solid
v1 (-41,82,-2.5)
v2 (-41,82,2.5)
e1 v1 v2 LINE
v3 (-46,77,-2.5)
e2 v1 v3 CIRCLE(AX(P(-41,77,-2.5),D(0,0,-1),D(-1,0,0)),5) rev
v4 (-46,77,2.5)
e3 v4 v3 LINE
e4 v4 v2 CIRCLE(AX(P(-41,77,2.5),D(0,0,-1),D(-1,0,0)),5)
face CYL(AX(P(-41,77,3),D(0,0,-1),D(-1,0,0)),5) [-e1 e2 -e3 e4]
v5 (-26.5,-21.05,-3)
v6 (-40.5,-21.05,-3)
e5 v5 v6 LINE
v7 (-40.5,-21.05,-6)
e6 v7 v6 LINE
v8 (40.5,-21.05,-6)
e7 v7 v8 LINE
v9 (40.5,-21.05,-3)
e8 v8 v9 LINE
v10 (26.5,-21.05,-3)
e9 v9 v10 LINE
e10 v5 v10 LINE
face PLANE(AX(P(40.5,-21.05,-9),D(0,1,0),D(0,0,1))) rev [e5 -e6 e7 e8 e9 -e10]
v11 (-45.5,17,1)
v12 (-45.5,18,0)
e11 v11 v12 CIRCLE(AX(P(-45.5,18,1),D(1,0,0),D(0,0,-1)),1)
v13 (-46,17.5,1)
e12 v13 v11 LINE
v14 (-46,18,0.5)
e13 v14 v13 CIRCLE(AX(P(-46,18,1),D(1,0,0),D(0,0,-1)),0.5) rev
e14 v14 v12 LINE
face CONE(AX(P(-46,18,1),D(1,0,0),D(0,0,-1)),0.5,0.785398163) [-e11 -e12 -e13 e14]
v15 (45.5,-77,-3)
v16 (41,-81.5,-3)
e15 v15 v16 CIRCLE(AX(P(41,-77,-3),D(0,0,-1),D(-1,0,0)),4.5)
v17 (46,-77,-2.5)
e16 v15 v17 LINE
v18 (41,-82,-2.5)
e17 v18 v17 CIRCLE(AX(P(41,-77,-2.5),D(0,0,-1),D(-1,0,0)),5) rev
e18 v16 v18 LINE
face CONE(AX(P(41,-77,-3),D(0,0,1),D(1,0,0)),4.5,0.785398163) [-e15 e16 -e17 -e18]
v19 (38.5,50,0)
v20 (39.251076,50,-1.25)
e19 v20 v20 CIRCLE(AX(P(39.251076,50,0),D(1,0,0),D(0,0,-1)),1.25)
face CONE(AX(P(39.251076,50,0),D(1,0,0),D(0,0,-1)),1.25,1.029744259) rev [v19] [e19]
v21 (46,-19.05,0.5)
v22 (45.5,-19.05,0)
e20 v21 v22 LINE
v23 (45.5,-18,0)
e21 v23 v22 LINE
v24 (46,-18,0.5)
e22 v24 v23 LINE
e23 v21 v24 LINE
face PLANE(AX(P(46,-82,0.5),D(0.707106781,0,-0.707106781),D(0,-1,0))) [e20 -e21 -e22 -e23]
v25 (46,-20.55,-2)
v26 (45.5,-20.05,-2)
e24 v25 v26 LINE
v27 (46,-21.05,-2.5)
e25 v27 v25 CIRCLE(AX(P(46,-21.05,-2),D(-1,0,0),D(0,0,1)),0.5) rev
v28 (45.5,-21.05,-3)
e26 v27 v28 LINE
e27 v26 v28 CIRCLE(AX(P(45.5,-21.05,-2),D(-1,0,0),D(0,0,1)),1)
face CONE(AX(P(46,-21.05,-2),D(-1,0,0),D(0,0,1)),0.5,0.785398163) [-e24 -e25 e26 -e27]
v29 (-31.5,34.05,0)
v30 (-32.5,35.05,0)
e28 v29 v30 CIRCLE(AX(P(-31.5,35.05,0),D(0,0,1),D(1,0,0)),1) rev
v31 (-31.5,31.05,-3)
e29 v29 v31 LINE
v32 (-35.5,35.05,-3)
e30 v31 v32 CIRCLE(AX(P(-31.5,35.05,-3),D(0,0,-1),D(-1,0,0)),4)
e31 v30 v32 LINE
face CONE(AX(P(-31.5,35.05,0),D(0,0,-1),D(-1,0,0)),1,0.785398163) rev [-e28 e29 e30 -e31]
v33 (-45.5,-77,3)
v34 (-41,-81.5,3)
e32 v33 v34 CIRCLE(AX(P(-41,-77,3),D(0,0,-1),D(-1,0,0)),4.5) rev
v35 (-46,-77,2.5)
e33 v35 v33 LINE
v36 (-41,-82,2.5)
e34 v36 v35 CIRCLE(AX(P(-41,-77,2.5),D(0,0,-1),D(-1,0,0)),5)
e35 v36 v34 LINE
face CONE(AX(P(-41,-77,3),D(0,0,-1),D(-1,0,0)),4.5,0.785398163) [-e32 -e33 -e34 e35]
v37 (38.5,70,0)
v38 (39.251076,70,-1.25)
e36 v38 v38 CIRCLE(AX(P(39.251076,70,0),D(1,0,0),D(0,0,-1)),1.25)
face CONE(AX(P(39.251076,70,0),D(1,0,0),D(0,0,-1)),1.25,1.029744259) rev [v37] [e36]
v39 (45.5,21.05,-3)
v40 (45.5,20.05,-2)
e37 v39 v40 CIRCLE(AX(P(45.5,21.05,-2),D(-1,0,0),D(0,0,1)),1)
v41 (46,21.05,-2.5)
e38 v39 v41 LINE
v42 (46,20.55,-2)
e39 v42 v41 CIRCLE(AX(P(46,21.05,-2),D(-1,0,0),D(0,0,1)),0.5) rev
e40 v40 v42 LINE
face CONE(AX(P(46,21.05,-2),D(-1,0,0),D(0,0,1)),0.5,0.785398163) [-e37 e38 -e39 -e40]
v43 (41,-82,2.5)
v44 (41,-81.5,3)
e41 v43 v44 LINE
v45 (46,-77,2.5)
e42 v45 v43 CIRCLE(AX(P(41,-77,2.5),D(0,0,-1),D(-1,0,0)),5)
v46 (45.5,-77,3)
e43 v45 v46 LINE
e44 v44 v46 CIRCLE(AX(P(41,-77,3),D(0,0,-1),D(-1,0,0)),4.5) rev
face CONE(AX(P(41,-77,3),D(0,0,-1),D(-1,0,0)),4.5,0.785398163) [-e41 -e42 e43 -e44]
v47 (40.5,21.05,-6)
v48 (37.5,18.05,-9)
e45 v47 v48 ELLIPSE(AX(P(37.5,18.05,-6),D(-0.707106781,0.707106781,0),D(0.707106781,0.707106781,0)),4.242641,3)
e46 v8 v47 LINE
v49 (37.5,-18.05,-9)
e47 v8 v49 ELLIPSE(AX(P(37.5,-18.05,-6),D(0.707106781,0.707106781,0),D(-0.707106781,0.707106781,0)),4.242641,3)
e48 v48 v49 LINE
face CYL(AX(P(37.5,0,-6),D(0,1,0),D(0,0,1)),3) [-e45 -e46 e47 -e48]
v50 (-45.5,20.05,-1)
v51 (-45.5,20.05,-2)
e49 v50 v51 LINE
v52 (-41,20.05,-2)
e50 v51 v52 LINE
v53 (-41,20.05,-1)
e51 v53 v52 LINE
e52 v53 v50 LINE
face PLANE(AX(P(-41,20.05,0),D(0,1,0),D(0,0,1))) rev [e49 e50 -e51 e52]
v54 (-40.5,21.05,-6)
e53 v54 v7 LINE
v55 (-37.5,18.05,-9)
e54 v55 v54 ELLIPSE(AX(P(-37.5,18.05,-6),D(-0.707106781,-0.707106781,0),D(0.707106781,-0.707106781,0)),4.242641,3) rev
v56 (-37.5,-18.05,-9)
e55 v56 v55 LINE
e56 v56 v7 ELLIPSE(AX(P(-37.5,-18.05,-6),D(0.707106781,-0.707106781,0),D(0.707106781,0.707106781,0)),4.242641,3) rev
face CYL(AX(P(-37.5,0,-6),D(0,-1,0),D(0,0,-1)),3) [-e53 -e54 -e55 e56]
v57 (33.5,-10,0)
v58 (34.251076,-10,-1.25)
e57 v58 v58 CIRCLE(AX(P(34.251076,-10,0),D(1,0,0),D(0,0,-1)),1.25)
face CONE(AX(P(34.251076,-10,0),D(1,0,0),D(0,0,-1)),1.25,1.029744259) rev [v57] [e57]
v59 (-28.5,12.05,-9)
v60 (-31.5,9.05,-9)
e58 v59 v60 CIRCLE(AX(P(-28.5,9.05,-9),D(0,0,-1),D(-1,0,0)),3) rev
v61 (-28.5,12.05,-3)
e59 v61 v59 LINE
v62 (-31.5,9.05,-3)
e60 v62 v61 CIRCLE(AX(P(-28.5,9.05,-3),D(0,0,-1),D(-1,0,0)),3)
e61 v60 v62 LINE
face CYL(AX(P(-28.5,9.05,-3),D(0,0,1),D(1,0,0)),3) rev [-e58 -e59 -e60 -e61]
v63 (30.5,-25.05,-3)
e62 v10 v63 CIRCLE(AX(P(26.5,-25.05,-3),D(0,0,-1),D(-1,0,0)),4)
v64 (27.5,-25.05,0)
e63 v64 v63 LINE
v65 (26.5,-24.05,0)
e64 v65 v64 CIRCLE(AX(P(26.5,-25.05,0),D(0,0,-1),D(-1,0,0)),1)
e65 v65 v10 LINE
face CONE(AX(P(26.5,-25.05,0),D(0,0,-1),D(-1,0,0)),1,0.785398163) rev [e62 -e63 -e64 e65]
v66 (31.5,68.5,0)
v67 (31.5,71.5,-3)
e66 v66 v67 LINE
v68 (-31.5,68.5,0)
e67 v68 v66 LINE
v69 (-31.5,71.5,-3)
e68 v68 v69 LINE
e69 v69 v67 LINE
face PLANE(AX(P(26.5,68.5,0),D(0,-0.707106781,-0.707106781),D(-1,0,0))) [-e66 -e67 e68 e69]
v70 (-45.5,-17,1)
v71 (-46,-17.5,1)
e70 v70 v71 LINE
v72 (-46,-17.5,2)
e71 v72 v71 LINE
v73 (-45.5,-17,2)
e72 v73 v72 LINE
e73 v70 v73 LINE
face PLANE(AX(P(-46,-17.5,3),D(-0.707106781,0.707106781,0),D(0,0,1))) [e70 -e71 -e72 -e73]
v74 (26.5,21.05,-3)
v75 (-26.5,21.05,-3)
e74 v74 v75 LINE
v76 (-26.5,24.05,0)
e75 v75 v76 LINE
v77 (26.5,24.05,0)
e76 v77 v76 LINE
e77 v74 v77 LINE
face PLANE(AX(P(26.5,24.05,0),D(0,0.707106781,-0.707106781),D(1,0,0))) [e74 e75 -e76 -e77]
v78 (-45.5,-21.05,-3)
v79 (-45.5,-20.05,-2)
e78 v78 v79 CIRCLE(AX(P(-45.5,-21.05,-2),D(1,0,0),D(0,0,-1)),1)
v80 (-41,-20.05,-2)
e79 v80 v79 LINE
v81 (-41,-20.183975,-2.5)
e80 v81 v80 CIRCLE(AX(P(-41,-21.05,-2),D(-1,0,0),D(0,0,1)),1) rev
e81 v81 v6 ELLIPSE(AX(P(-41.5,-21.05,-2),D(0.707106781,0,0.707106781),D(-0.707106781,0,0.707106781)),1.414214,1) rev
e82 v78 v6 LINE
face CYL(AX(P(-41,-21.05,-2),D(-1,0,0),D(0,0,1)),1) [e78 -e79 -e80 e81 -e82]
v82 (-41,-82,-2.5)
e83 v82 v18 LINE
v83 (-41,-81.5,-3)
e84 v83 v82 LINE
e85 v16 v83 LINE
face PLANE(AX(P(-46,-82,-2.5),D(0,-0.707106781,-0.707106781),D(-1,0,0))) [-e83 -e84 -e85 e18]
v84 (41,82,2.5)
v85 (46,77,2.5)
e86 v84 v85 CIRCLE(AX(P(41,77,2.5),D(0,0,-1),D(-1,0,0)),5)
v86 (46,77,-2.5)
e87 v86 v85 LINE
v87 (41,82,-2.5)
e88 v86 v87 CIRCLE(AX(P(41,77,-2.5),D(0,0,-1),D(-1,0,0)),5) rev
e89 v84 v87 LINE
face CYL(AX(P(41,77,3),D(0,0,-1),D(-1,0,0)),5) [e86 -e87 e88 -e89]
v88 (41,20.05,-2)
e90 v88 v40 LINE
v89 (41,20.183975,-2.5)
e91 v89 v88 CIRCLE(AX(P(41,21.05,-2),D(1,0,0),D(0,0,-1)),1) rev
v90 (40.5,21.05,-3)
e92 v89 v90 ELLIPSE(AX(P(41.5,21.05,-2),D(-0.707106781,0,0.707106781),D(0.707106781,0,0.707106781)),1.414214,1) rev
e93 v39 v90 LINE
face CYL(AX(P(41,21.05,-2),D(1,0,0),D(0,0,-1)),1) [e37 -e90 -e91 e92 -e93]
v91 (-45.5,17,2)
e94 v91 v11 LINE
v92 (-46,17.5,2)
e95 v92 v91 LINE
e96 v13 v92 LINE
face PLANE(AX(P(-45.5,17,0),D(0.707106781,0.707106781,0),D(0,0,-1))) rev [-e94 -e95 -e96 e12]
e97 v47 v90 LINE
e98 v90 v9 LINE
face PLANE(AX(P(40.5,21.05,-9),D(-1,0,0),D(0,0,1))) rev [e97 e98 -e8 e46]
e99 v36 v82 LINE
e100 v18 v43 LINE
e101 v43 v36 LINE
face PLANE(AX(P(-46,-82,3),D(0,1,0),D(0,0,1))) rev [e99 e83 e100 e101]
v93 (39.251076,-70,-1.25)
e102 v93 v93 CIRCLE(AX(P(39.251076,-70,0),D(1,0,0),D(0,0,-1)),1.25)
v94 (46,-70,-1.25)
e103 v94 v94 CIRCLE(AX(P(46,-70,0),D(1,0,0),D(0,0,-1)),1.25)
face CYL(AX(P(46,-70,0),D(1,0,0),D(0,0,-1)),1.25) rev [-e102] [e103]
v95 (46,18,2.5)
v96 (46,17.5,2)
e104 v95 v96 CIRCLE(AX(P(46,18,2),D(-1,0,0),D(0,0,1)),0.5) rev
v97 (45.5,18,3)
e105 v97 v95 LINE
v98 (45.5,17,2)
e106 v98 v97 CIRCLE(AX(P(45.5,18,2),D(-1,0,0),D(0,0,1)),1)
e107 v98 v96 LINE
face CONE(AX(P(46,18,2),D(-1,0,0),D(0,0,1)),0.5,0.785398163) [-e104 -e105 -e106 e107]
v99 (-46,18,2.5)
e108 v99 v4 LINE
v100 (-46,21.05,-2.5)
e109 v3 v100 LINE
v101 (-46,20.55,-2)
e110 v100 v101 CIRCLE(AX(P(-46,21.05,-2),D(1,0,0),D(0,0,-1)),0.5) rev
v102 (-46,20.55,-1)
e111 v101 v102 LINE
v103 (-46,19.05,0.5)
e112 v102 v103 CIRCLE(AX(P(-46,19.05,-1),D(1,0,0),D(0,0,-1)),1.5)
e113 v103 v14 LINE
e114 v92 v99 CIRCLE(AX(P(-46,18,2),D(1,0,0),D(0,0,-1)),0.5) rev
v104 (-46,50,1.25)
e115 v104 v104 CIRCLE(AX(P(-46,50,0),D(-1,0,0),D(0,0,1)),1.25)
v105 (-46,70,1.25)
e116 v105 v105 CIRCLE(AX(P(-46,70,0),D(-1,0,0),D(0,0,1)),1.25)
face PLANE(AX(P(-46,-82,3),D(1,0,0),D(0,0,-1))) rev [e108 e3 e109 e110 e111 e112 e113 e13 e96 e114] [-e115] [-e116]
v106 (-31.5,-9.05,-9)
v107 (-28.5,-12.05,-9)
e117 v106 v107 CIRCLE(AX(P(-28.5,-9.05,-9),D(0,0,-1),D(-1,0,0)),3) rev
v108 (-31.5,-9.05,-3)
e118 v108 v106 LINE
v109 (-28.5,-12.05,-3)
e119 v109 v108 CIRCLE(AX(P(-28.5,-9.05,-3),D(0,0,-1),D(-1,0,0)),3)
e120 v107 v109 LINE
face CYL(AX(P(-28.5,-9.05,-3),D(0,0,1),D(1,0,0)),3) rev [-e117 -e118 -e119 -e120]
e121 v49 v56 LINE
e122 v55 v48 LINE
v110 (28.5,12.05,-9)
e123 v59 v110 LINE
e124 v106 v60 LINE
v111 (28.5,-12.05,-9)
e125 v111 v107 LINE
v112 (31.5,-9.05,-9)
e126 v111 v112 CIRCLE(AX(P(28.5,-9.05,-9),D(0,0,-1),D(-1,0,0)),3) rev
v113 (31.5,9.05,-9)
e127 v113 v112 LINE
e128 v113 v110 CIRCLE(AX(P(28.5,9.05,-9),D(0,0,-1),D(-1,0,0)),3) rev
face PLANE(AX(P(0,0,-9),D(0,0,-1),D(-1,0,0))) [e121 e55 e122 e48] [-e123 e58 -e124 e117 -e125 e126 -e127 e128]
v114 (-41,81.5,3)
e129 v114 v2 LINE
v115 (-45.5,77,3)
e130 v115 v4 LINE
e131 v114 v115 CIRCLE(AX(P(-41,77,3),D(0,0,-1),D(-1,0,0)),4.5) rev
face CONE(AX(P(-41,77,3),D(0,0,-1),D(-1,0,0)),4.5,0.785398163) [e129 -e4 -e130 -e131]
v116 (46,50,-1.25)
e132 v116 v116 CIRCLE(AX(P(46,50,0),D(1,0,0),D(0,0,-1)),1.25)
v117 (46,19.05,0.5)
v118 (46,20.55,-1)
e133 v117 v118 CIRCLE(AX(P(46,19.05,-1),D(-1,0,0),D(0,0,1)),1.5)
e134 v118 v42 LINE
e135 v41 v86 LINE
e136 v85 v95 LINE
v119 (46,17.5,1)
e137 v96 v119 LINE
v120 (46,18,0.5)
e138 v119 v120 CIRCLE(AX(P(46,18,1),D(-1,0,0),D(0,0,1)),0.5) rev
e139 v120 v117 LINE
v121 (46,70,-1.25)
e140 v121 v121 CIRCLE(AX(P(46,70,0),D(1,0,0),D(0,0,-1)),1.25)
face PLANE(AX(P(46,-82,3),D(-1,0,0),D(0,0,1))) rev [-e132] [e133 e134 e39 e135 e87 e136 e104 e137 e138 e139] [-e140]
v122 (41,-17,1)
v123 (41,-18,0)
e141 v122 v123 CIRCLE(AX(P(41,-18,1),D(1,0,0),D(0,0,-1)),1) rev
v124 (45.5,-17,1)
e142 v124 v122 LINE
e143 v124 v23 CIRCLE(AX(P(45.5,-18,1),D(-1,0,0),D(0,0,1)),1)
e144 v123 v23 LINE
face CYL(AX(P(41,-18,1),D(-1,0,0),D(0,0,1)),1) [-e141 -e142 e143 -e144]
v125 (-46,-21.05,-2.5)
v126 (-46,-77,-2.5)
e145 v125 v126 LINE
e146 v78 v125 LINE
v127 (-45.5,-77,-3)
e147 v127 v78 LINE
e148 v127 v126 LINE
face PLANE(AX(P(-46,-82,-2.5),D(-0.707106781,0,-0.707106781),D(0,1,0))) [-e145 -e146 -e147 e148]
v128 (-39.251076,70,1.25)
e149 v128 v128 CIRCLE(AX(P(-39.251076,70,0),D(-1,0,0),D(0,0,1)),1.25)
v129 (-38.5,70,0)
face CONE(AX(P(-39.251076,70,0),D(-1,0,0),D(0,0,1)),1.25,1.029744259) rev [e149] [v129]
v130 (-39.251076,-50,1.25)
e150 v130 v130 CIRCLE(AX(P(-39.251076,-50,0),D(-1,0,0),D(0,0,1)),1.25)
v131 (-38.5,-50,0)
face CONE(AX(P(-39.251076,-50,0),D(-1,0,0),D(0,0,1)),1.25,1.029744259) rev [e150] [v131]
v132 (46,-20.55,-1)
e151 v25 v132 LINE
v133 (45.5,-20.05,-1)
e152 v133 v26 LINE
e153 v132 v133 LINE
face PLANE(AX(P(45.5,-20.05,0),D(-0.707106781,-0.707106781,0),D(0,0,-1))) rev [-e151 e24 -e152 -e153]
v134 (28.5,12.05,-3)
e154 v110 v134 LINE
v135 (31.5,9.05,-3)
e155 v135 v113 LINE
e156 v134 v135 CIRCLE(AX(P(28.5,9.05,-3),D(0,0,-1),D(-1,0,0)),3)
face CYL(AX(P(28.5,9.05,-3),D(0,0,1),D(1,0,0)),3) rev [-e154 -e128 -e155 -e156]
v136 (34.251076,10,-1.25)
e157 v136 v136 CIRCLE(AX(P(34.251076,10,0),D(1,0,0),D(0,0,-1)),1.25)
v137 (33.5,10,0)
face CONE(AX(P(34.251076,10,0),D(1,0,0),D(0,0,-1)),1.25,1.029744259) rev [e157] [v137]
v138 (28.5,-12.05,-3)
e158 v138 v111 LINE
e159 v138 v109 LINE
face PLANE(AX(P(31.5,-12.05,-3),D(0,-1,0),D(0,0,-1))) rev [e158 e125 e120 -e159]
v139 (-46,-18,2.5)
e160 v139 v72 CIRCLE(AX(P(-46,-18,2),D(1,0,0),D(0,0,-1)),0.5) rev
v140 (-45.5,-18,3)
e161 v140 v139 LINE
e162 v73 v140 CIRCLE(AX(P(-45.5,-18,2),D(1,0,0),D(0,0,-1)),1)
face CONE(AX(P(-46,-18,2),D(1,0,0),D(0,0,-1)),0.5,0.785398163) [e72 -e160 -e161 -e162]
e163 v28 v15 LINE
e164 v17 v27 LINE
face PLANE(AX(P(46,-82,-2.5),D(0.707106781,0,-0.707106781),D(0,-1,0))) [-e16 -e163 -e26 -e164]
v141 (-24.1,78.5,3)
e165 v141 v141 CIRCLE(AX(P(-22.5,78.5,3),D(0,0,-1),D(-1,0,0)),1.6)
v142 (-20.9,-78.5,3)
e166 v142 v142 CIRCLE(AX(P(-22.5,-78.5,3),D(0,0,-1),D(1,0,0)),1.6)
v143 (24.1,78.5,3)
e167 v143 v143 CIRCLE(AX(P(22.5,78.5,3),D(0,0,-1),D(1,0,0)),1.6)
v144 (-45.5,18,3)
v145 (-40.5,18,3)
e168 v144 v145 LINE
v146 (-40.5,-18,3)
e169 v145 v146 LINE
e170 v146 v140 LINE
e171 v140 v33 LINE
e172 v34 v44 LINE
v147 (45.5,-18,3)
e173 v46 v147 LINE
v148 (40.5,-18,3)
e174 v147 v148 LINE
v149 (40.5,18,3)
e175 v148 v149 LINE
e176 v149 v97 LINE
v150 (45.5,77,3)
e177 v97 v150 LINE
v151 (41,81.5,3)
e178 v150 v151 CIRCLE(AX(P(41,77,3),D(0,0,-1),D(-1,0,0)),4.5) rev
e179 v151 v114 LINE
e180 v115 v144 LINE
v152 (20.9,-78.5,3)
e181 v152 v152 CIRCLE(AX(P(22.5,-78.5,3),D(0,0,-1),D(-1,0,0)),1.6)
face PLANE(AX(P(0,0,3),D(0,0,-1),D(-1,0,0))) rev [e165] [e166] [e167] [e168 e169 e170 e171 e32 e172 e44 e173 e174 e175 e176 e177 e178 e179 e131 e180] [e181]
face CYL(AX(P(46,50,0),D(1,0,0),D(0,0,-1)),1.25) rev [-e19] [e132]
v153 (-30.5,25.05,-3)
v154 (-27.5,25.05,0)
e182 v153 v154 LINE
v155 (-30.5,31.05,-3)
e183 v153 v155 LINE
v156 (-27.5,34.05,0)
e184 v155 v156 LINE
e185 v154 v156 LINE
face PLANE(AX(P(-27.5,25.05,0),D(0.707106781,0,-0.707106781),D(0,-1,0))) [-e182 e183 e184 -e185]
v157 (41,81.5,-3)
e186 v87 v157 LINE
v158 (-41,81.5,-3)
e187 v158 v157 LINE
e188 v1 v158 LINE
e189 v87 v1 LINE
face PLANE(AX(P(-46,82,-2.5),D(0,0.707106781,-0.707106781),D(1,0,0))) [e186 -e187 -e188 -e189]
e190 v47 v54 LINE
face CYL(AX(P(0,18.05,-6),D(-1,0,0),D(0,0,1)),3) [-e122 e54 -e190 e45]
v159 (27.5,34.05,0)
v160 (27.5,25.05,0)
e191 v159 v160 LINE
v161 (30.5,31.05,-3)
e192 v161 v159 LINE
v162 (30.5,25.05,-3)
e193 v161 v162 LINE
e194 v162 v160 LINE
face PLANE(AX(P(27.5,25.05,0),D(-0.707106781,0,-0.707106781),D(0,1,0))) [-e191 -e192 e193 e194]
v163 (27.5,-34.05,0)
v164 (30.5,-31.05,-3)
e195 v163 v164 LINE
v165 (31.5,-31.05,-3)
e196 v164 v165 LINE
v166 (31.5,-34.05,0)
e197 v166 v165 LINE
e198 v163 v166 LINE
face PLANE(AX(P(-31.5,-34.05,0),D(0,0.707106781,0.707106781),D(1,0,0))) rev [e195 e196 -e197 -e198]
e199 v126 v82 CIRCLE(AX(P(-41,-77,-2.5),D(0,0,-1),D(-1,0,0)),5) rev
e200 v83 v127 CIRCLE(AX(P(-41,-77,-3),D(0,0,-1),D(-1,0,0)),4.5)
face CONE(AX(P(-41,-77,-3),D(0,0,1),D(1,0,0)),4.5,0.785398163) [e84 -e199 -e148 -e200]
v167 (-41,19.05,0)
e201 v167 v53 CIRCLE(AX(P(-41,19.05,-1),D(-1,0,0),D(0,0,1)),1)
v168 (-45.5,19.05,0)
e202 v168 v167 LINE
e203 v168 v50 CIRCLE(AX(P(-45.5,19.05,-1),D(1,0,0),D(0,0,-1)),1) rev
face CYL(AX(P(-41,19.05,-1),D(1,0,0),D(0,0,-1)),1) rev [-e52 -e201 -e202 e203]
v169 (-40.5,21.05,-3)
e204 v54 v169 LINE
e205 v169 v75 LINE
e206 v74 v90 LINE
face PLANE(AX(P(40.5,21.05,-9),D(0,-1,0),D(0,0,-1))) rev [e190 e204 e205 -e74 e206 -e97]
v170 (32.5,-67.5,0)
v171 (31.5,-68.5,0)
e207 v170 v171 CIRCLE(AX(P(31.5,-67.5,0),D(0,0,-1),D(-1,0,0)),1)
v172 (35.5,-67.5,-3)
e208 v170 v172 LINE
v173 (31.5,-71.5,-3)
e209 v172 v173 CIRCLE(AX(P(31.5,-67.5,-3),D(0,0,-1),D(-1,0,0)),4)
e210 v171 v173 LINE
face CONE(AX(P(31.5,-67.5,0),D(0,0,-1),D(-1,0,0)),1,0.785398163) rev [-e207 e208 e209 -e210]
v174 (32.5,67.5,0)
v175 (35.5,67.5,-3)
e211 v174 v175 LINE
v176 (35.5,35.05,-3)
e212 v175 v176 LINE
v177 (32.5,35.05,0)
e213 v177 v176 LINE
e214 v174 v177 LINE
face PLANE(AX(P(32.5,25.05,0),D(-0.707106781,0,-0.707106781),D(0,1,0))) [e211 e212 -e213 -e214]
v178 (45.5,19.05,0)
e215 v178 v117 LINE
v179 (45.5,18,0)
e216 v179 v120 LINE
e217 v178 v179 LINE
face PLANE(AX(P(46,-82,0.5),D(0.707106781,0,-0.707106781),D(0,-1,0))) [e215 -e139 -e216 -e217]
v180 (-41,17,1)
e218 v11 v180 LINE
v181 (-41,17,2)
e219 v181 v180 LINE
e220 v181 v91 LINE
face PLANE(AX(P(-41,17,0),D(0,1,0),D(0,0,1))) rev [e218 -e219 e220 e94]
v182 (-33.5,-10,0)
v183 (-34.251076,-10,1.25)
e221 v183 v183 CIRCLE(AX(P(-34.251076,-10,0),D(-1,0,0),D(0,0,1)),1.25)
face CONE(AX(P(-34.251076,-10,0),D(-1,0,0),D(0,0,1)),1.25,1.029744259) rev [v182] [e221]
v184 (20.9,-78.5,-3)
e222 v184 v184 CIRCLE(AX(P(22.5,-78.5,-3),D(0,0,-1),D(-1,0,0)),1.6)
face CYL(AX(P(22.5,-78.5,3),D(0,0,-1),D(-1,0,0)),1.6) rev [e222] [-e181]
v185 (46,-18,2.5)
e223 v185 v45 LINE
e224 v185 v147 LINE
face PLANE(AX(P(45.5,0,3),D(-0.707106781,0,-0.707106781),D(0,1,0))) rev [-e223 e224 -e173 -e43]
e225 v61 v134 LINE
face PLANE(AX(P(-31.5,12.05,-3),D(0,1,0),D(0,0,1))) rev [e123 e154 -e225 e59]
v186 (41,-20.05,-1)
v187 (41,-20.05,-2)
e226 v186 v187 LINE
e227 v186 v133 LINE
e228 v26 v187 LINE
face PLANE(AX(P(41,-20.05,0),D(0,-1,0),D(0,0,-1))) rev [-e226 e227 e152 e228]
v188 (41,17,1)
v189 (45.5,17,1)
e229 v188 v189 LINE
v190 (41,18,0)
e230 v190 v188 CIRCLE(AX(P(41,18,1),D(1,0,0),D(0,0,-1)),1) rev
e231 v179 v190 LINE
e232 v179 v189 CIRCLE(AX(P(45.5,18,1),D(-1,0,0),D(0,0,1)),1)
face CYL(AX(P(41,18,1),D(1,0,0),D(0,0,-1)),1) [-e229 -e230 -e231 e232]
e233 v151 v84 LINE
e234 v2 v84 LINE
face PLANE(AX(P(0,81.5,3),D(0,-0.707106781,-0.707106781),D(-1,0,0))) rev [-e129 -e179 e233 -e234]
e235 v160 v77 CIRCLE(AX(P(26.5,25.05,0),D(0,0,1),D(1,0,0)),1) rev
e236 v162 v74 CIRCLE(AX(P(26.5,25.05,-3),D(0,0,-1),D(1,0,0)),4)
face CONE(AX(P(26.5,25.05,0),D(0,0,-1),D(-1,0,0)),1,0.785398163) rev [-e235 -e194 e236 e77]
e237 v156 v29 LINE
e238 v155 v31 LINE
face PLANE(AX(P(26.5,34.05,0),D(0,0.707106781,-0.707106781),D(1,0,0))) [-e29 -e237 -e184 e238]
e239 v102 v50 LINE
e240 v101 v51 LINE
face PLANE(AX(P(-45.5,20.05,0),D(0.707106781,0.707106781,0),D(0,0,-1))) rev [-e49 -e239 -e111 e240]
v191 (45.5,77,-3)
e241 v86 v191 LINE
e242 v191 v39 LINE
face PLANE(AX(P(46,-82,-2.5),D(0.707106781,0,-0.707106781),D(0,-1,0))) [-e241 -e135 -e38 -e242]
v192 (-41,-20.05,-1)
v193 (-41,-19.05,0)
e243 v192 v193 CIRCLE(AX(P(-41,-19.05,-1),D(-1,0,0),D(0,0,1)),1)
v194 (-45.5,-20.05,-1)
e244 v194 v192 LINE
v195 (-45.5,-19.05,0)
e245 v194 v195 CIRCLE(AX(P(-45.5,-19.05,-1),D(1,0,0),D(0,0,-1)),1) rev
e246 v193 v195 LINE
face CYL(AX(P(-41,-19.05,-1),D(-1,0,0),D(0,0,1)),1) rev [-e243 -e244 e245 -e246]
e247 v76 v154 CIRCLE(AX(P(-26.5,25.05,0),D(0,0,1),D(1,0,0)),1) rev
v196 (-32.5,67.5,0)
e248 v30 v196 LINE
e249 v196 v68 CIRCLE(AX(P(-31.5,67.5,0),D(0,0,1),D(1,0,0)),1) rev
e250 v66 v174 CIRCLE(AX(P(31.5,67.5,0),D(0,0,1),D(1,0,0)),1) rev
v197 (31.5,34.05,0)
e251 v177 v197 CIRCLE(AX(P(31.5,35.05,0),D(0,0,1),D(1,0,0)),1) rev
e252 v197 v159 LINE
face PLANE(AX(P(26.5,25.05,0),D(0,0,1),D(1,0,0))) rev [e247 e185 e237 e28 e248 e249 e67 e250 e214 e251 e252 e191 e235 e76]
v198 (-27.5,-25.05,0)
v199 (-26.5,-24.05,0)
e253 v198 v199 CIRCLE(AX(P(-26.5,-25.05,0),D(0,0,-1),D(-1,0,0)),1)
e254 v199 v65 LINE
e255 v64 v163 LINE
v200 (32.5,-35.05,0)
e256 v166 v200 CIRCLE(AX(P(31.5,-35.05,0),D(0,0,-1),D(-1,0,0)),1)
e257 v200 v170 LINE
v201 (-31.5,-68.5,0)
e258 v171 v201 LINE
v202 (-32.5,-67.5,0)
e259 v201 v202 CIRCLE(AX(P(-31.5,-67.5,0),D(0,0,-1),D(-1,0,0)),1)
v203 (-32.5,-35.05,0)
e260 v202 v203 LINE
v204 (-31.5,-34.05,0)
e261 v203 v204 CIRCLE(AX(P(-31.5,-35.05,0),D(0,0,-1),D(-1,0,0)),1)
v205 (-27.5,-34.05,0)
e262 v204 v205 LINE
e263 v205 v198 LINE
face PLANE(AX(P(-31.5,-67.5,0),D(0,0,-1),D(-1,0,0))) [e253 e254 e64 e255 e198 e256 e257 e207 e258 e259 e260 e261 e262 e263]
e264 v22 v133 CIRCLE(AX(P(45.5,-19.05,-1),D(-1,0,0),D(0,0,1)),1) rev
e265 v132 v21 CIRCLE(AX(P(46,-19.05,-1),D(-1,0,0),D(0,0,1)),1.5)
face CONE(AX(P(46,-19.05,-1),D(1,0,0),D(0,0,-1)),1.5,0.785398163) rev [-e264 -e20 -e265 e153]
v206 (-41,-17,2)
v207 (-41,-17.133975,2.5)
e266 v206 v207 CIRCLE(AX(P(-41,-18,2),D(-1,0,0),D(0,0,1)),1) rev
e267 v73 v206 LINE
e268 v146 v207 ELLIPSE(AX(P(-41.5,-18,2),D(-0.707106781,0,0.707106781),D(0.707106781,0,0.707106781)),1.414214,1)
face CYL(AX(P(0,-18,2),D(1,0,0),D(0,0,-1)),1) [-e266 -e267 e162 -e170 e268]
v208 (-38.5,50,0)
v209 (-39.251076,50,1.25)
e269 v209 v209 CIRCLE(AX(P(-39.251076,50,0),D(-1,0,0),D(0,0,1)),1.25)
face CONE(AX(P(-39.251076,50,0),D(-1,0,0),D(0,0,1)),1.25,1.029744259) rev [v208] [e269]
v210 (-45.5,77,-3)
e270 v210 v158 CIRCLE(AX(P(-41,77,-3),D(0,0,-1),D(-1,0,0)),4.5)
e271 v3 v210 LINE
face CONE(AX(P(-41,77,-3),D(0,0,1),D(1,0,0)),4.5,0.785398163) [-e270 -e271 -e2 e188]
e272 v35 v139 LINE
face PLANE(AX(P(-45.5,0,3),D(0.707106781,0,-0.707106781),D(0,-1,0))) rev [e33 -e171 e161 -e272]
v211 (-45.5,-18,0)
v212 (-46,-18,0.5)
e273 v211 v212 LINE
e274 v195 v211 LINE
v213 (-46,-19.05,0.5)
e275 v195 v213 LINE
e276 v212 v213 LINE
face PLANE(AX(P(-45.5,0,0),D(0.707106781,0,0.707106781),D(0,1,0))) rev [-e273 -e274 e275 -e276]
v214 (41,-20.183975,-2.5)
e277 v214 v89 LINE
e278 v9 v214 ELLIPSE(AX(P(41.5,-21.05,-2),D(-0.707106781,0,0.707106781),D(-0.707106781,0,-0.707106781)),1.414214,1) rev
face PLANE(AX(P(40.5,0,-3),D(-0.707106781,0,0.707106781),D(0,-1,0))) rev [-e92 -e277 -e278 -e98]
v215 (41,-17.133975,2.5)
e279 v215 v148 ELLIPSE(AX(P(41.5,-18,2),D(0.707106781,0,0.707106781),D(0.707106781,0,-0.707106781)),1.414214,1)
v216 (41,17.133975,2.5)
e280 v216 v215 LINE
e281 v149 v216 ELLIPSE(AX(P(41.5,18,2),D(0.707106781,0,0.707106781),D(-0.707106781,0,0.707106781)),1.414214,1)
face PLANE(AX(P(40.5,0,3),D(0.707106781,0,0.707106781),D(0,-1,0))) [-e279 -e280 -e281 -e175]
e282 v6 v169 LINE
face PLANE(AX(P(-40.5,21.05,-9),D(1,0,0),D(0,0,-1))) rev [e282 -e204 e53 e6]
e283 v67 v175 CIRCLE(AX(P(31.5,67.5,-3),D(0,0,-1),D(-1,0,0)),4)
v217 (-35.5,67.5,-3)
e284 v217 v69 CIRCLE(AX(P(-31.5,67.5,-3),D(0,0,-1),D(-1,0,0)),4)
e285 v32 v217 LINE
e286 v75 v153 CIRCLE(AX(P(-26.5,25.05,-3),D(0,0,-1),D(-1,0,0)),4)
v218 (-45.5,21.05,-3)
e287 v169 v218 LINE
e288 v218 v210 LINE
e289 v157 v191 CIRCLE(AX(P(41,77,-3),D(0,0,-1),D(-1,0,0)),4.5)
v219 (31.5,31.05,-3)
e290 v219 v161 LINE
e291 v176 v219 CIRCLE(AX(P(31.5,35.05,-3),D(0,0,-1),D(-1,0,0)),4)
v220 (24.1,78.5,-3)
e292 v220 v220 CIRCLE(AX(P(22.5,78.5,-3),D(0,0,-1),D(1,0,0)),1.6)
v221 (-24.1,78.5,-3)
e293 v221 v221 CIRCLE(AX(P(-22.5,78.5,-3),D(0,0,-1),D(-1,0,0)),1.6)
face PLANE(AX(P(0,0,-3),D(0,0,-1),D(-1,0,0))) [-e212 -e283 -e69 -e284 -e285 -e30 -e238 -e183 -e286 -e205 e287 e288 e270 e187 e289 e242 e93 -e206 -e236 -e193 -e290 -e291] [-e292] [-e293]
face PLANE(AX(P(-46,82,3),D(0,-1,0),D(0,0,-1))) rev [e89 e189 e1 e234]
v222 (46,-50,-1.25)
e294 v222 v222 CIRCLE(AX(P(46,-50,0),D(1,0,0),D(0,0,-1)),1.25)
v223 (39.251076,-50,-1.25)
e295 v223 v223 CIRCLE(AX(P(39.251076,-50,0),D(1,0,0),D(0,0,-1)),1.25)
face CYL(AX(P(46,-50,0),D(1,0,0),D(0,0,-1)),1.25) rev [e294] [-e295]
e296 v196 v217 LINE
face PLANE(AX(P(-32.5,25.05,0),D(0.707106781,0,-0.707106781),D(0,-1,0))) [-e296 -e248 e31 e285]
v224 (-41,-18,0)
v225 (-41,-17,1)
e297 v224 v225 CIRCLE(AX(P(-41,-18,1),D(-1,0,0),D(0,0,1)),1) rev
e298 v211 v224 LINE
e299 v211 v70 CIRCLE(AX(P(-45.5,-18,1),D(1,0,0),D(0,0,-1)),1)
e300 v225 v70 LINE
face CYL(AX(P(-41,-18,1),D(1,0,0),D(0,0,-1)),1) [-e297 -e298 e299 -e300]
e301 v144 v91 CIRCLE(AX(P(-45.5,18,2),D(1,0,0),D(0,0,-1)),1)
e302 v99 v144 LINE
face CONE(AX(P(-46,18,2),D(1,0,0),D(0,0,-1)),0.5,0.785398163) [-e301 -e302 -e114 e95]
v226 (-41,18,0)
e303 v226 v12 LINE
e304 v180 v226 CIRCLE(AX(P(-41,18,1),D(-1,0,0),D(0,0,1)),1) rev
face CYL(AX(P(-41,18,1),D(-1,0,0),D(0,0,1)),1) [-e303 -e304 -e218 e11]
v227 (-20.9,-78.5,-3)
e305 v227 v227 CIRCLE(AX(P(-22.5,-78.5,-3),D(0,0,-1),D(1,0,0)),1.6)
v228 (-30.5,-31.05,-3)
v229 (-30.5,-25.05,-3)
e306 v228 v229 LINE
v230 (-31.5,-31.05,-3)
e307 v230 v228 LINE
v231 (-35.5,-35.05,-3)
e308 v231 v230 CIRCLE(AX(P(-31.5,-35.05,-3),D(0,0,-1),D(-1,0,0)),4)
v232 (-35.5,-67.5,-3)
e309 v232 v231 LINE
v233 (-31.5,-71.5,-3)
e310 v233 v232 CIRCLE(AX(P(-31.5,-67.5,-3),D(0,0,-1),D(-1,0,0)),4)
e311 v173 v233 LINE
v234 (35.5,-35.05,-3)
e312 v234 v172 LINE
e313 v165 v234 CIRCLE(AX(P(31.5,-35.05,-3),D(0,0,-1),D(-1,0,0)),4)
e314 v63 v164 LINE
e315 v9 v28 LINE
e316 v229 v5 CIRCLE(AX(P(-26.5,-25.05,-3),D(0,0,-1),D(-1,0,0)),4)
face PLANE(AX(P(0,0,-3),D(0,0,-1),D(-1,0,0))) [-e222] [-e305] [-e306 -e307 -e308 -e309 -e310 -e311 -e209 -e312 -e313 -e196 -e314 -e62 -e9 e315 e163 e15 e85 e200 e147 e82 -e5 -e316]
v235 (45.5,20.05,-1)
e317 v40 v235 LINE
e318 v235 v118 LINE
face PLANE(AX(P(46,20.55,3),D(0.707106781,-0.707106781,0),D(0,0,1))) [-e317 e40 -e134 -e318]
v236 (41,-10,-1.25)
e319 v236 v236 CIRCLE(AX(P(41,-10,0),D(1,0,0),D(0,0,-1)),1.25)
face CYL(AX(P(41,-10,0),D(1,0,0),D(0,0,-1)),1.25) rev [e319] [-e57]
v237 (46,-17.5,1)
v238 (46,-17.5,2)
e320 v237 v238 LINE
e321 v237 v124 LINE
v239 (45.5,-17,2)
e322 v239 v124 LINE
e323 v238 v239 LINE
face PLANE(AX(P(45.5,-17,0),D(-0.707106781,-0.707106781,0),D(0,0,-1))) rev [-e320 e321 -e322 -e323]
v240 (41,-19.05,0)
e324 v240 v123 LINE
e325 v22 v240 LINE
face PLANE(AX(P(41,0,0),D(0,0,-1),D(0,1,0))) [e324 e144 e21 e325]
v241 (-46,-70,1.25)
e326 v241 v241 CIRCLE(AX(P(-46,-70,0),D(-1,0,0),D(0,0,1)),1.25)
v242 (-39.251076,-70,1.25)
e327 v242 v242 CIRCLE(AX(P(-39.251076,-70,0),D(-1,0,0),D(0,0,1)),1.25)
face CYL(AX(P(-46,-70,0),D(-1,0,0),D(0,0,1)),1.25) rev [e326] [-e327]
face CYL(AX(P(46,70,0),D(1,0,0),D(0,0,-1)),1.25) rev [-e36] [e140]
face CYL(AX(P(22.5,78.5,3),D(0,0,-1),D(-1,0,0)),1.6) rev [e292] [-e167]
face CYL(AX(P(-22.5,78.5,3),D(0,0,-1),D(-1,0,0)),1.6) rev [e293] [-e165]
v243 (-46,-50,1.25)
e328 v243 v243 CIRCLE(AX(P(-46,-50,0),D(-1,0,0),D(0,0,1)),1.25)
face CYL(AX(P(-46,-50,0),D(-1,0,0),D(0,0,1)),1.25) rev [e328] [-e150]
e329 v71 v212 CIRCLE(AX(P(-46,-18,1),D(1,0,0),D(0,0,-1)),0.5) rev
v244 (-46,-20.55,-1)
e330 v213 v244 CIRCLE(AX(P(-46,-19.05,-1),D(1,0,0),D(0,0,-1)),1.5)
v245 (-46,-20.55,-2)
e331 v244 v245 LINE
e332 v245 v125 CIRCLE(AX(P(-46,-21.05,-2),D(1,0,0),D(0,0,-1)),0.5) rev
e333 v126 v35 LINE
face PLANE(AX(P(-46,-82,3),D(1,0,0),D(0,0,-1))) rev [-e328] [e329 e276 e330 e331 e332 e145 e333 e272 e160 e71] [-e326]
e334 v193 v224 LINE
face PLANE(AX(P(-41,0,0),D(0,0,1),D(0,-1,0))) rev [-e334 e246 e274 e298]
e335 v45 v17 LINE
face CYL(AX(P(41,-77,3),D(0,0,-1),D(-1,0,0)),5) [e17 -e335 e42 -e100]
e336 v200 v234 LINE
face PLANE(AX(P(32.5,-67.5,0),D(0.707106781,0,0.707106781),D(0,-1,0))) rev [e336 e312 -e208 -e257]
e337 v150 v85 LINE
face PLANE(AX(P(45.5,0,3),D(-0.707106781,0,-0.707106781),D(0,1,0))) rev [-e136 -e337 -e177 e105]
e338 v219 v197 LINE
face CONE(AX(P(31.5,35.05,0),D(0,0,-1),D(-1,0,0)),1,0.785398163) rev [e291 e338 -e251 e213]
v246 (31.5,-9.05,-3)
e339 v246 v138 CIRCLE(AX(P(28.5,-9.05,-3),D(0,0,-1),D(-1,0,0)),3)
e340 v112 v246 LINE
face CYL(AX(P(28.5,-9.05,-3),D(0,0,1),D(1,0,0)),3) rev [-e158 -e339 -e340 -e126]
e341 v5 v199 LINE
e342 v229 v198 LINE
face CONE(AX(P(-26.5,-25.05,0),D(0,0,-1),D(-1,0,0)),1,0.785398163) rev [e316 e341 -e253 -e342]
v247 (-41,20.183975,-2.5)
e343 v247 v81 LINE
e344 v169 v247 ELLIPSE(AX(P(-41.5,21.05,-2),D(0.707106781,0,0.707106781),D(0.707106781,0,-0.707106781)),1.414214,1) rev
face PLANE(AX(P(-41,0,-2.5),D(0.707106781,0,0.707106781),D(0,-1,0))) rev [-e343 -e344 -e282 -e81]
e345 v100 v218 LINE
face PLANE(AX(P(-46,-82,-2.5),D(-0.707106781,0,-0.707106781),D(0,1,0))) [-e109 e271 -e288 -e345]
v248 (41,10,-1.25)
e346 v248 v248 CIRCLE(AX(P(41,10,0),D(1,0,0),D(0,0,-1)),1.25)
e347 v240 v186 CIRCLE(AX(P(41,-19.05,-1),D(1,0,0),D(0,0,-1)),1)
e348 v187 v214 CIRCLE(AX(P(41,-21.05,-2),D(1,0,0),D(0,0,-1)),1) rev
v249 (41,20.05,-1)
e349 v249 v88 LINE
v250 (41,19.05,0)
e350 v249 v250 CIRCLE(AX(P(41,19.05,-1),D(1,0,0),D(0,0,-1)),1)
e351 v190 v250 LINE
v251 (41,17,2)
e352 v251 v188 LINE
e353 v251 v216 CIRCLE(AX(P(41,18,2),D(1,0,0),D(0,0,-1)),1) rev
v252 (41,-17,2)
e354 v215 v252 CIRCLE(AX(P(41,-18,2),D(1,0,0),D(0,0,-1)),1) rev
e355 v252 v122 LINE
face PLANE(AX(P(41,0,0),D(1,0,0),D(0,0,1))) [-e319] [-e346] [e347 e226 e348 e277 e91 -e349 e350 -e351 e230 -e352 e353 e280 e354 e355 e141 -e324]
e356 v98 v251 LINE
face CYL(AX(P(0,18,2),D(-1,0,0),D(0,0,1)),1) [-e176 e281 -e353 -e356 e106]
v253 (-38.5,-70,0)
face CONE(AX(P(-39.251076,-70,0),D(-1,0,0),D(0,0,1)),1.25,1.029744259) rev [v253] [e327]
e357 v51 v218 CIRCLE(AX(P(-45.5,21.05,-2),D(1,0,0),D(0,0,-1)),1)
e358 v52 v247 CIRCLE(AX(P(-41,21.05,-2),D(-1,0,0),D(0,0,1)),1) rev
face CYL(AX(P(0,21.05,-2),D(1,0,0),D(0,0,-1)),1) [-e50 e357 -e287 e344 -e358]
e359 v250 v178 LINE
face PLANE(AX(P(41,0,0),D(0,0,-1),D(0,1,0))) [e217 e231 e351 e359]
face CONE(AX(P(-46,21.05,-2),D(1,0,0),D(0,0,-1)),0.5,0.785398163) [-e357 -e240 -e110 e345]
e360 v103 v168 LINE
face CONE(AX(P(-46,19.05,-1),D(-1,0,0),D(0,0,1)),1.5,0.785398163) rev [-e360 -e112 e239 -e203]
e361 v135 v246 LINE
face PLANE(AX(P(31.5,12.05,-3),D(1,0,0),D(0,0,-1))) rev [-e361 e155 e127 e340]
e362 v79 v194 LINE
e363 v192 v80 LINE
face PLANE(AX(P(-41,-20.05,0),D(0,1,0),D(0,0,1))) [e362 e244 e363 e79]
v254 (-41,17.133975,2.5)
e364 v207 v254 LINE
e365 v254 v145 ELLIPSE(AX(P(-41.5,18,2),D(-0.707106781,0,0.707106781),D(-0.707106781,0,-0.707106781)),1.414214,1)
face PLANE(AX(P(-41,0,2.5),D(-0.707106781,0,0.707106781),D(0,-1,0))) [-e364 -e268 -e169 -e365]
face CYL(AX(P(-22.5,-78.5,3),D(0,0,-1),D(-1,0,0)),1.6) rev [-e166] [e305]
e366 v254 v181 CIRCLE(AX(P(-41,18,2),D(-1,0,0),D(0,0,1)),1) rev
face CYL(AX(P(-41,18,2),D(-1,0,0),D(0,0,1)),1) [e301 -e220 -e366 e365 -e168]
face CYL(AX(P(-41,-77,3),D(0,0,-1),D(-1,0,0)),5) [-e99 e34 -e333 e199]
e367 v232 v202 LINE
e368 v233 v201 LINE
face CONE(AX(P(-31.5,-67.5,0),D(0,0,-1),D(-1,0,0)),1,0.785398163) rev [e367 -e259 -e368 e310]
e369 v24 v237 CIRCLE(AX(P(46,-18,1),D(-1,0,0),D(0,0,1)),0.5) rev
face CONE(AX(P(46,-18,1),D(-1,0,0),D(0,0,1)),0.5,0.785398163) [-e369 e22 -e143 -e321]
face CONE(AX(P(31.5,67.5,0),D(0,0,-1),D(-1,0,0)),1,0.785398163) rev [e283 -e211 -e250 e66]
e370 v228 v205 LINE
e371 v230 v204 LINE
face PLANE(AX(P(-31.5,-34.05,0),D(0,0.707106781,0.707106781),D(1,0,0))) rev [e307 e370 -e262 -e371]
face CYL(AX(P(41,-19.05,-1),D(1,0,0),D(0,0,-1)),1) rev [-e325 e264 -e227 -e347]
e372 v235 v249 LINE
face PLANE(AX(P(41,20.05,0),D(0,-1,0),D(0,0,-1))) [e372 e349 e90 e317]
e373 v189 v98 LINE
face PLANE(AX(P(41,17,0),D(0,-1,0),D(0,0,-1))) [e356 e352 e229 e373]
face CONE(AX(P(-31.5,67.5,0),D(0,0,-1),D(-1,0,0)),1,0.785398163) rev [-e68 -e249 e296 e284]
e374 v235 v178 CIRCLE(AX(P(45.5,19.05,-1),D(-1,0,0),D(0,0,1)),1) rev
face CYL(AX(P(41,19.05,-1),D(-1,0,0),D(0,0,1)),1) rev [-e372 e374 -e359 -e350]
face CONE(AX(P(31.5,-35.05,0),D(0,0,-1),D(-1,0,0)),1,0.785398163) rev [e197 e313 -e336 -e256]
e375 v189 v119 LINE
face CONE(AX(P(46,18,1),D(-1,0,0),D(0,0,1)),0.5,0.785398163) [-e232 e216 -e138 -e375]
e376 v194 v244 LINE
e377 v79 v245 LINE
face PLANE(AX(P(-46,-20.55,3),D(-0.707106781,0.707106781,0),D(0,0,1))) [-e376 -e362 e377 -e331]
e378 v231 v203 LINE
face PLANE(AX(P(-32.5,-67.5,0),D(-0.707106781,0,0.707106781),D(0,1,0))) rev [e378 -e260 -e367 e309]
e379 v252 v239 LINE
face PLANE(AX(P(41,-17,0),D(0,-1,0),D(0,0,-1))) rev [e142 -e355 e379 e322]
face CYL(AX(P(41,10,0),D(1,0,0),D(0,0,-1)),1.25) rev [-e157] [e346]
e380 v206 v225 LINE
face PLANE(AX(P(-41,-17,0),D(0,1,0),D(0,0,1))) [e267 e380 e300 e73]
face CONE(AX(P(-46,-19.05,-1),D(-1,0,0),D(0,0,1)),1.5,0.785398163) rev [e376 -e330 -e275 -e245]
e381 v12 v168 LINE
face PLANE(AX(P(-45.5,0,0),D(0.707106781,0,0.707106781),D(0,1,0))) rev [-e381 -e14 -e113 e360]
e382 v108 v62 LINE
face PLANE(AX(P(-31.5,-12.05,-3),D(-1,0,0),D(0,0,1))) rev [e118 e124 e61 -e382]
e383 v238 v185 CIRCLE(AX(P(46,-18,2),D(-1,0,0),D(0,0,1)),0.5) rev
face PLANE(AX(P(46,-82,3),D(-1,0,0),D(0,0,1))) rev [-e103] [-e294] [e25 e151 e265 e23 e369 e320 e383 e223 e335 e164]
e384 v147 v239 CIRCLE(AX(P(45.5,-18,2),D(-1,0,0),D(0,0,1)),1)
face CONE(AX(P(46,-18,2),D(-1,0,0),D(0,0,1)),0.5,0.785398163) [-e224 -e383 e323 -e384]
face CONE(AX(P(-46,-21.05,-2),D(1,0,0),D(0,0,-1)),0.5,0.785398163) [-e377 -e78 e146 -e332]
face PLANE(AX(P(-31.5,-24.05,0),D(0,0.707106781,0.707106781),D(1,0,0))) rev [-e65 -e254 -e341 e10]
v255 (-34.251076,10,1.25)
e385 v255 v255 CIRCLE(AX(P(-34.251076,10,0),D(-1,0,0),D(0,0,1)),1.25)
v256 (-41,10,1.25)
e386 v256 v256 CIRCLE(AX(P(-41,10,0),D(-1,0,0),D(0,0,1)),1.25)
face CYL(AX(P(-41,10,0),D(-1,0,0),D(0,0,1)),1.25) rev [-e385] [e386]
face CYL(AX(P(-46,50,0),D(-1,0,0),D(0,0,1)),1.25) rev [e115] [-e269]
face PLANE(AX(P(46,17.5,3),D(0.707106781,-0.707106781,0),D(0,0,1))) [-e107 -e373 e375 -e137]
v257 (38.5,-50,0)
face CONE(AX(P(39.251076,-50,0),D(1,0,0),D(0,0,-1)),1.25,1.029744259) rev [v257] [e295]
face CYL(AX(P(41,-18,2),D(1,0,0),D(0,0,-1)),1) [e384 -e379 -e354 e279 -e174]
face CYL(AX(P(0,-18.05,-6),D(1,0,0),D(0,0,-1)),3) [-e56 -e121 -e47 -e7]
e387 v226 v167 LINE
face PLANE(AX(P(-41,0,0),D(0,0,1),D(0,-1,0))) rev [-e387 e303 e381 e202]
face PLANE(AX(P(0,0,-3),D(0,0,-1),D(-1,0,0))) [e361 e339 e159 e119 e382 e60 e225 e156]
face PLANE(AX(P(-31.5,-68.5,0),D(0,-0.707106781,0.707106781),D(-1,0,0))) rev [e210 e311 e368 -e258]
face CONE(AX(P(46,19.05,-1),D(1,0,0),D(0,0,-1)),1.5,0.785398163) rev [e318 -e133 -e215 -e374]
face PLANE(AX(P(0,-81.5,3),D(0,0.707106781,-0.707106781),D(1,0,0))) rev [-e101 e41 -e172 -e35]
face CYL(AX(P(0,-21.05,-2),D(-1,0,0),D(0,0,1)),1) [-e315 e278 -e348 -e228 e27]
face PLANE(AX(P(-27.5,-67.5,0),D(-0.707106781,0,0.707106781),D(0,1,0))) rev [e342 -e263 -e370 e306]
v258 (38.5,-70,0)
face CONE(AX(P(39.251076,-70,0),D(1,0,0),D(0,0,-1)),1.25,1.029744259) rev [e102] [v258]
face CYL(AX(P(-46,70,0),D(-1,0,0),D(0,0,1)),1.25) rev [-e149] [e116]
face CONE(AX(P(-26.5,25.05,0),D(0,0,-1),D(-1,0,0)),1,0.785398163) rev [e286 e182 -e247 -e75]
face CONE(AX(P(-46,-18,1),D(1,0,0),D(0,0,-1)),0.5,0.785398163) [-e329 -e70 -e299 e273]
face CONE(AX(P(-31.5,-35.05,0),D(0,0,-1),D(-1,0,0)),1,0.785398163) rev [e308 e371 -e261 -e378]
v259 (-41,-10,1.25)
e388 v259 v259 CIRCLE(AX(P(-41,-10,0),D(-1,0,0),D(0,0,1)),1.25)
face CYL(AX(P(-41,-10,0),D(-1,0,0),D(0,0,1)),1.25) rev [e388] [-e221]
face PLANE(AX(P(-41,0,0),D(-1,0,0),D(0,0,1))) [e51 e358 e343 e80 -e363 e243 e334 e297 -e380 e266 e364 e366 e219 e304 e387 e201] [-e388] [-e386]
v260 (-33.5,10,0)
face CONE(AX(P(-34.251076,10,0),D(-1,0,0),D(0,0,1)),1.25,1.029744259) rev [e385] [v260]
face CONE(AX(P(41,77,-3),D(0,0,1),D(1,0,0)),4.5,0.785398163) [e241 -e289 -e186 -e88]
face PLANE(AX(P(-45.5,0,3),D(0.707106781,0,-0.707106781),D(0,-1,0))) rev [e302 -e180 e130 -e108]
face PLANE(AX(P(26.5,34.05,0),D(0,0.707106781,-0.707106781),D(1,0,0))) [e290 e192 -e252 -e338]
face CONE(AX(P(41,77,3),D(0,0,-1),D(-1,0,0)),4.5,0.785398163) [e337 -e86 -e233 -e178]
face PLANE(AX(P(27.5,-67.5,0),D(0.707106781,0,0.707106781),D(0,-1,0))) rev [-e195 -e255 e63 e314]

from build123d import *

# Parameters (mm, degrees)
SKETCH_1_W                  = 92
SKETCH_1_H                  = 164
EXTRUDE_1_DEPTH             = 3
SKETCH_97_W                 = 3
SKETCH_97_H                 = 34
CUT_EXTRUDE_1_DEPTH         = 5
HOLE_WIZARD_M3_1_AT_2_COUNT = 2
HOLE_WIZARD_M3_1_AT_2_PITCH = 20
HOLE_WIZARD_M3_2_AT_2_COUNT = 2
HOLE_WIZARD_M3_2_AT_2_PITCH = 140
HOLE_WIZARD_M3_2_AT_3_COUNT = 2
HOLE_WIZARD_M3_2_AT_3_PITCH = 20
HOLE_WIZARD_M3_2_AT_4_COUNT = 2
HOLE_WIZARD_M3_2_AT_4_PITCH = 120
FILLET_3_R                  = 5
FILLET_5_R                  = 1
CHAMFER_2_SIZE              = 0.5
SKETCH_119_R                = 1.6
CUT_EXTRUDE_6_DEPTH         = 95.212525707
CUT_EXTRUDE_7_DEPTH         = 3
CHAMFER_3_SIZE              = 3
SKETCH_122_W                = 81
SKETCH_122_H                = 42.1
EXTRUDE_3_DEPTH             = 6
FILLET_11_R                 = 3
SKETCH_123_W                = 63
SKETCH_123_H                = 24.1
CUT_EXTRUDE_8_DEPTH         = 6
FILLET_12_R                 = 3


with BuildPart() as part:
    # 草图1 → 凸台-拉伸1 (new, symmetric)
    with BuildSketch(Plane.XY):
        Rectangle(SKETCH_1_W, SKETCH_1_H)
    extrude(amount=EXTRUDE_1_DEPTH, both=True)

    # 草图97 → 切除-拉伸1 (cut)
    with BuildSketch(Plane.ZY.offset(46)):
        Polygon((-3, -20.05), (0, -20.05), (0, -17), (0, 17), (0, 20.05), (-3, 20.05), align=None)
        with Locations((1.5, 0)):
            Rectangle(SKETCH_97_W, SKETCH_97_H)
    cut_extrude_1 = extrude(amount=-CUT_EXTRUDE_1_DEPTH, mode=Mode.SUBTRACT)

    # 草图100 → M3 螺纹孔1 (revolve, cut)
    with BuildSketch(Plane(origin=(-41, 10, 0), x_dir=(0, 0, 1), z_dir=(0, 1, 0))):
        Polygon((0, 0), (0, 7.5), (1.25, 6.748924226), (1.25, 0), align=None)
    hole_wizard_m3_1 = revolve(axis=Axis((-47.35, 10, 0), (1, 0, 0)), mode=Mode.SUBTRACT)

    # M3 螺纹孔1 at 2: M3 螺纹孔1 ×2
    with Locations(*[(0, -i * HOLE_WIZARD_M3_1_AT_2_PITCH, 0) for i in range(1, HOLE_WIZARD_M3_1_AT_2_COUNT)]):
        add(hole_wizard_m3_1, mode=Mode.SUBTRACT)

    # 镜向1: 切除-拉伸1, M3 螺纹孔1 across plane
    add(cut_extrude_1.mirror(Plane(origin=(0, 0, 0), x_dir=(0, 0, 1), z_dir=(1, 0, 0))), mode=Mode.SUBTRACT)
    add(hole_wizard_m3_1.mirror(Plane(origin=(0, 0, 0), x_dir=(0, 0, 1), z_dir=(1, 0, 0))), mode=Mode.SUBTRACT)

    # 镜向1 copy 1 sketch → 镜向1 copy 1 (revolve, cut)
    with BuildSketch(Plane(origin=(41, -10, 0), x_dir=(0, 0, 1), z_dir=(0, 1, 0))):
        Polygon((0, 0), (0, -7.5), (1.25, -6.748924226), (1.25, 0), align=None)
    revolve(axis=Axis((47.35, -10, 0), (1, 0, 0)), mode=Mode.SUBTRACT)

    # 草图113 → M3 螺纹孔2 (revolve, cut)
    with BuildSketch(Plane(origin=(-46, -70, 0), x_dir=(0, 0, 1), z_dir=(0, 1, 0))):
        Polygon((0, 0), (0, 7.5), (1.25, 6.748924226), (1.25, 0), align=None)
    hole_wizard_m3_2 = revolve(axis=Axis((-52.35, -70, 0), (1, 0, 0)), mode=Mode.SUBTRACT)

    # M3 螺纹孔2 at 2: M3 螺纹孔2 ×2
    with Locations(*[(0, i * HOLE_WIZARD_M3_2_AT_2_PITCH, 0) for i in range(1, HOLE_WIZARD_M3_2_AT_2_COUNT)]):
        add(hole_wizard_m3_2, mode=Mode.SUBTRACT)

    # M3 螺纹孔2 at 3: M3 螺纹孔2 ×2
    with Locations(*[(0, i * HOLE_WIZARD_M3_2_AT_3_PITCH, 0) for i in range(1, HOLE_WIZARD_M3_2_AT_3_COUNT)]):
        add(hole_wizard_m3_2, mode=Mode.SUBTRACT)

    # M3 螺纹孔2 at 4: M3 螺纹孔2 ×2
    with Locations(*[(0, i * HOLE_WIZARD_M3_2_AT_4_PITCH, 0) for i in range(1, HOLE_WIZARD_M3_2_AT_4_COUNT)]):
        add(hole_wizard_m3_2, mode=Mode.SUBTRACT)

    # 镜向2: M3 螺纹孔2 across plane
    add(hole_wizard_m3_2.mirror(Plane(origin=(0, 0, 0), x_dir=(0, 0, 1), z_dir=(1, 0, 0))), mode=Mode.SUBTRACT)

    # 镜向2 copy 1 sketch → 镜向2 copy 1 (revolve, cut)
    with BuildSketch(Plane(origin=(46, 70, 0), x_dir=(0, 0, 1), z_dir=(0, 1, 0))):
        Polygon((0, 0), (0, -7.5), (1.25, -6.748924226), (1.25, 0), align=None)
    revolve(axis=Axis((52.35, 70, 0), (1, 0, 0)), mode=Mode.SUBTRACT)

    # 镜向2 copy 2 sketch → 镜向2 copy 2 (revolve, cut)
    with BuildSketch(Plane(origin=(46, -50, 0), x_dir=(0, 0, 1), z_dir=(0, 1, 0))):
        Polygon((0, 0), (0, -7.5), (1.25, -6.748924226), (1.25, 0), align=None)
    revolve(axis=Axis((52.35, -50, 0), (1, 0, 0)), mode=Mode.SUBTRACT)

    # 镜向2 copy 3 sketch → 镜向2 copy 3 (revolve, cut)
    with BuildSketch(Plane(origin=(46, 50, 0), x_dir=(0, 0, 1), z_dir=(0, 1, 0))):
        Polygon((0, 0), (0, -7.5), (1.25, -6.748924226), (1.25, 0), align=None)
    revolve(axis=Axis((52.35, 50, 0), (1, 0, 0)), mode=Mode.SUBTRACT)

    # 圆角3
    fillet_3_edges = [part.edges().sort_by_distance(p)[0] for p in [
        (46, -82, 0),
        (-46, -82, 0),
        (-46, 82, 0),
        (46, 82, 0),
    ]]
    fillet(fillet_3_edges, radius=FILLET_3_R)

    # 圆角5
    fillet_5_edges = [part.edges().sort_by_distance(p)[0] for p in [
        (-43.5, -17, 0),
        (-43.5, -20.05, 0),
        (-43.5, -20.05, -3),
        (-43.5, 20.05, -3),
        (-43.5, 20.05, 0),
        (-43.5, 17, 0),
        (-43.5, 17, 3),
        (-43.5, -17, 3),
        (43.5, -20.05, 0),
        (43.5, -17, 0),
        (43.5, -17, 3),
        (43.5, 17, 3),
        (43.5, 17, 0),
        (43.5, 20.05, 0),
        (43.5, 20.05, -3),
        (43.5, -20.05, -3),
    ]]
    fillet(fillet_5_edges, radius=FILLET_5_R)

    # 倒角2
    chamfer_2_edges = [part.edges().sort_by_distance(p)[0] for p in [
        (-46, 49.025, -3),
        (-46, 47.5, 3),
        (46, -49.025, -3),
        (0, -82, -3),
        (0, 82, -3),
        (-44.535533906, -80.535533906, -3),
        (44.535533906, -80.535533906, -3),
        (44.535533906, 80.535533906, -3),
        (-44.535533906, 80.535533906, -3),
        (0, 82, 3),
        (46, -47.5, 3),
        (0, -82, 3),
        (-44.535533906, -80.535533906, 3),
        (44.535533906, -80.535533906, 3),
        (44.535533906, 80.535533906, 3),
        (-44.535533906, 80.535533906, 3),
        (-46, -20.05, -1.5),
        (-46, -49.025, -3),
        (-46, -47.5, 3),
        (-46, -17, 1.5),
        (-46, -18.525, 0),
        (-46, -17.292893219, 0.292893219),
        (-46, -17.292893219, 2.707106781),
        (-46, -20.342893219, -2.707106781),
        (46, 49.025, -3),
        (-46, 20.05, -1.5),
        (-46, 18.525, 0),
        (-46, 17, 1.5),
        (-46, 17.292893219, 0.292893219),
        (-46, 17.292893219, 2.707106781),
        (-46, 20.342893219, -2.707106781),
        (46, -20.05, -1.5),
        (46, -18.525, 0),
        (46, -17, 1.5),
        (46, -17.292893219, 0.292893219),
        (46, -17.292893219, 2.707106781),
        (46, -20.342893219, -2.707106781),
        (46, 20.05, -1.5),
        (46, 47.5, 3),
        (46, 17, 1.5),
        (46, 18.525, 0),
        (46, 17.292893219, 0.292893219),
        (46, 17.292893219, 2.707106781),
        (46, 20.342893219, -2.707106781),
        (46, -19.757106781, -0.292893219),
        (46, 19.757106781, -0.292893219),
        (-46, 19.757106781, -0.292893219),
        (-46, -19.757106781, -0.292893219),
        (-41, 0, -3),
        (-41, 0, 3),
        (41, 0, 3),
        (41, 0, -3),
    ]]
    chamfer(chamfer_2_edges, length=CHAMFER_2_SIZE)

    # 草图119 → 切除-拉伸6 (cut, through all)
    with BuildSketch(Plane(origin=(0, 0, -3), x_dir=(-1, 0, 0), z_dir=(0, 0, -1))):
        with Locations((22.5, 78.5)):
            Circle(SKETCH_119_R)
        with Locations(Location((-22.5, 78.5, 0), (0, 0, 180))):
            Circle(SKETCH_119_R)
        with Locations(Location((22.5, -78.5, 0), (0, 0, 180))):
            Circle(SKETCH_119_R)
        with Locations((-22.5, -78.5)):
            Circle(SKETCH_119_R)
    extrude(amount=-CUT_EXTRUDE_6_DEPTH, mode=Mode.SUBTRACT)

    # 草图120 → 切除-拉伸7 (cut)
    with BuildSketch(Plane(origin=(0, 0, -3), x_dir=(-1, 0, 0), z_dir=(0, 0, -1))):
        with BuildLine():
            Line((-26.5, 21.05), (26.5, 21.05))
            ThreePointArc((26.5, 21.05), (29.328427125, 22.221572875), (30.5, 25.05))
            Line((30.5, 25.05), (30.5, 31.05))
            Line((30.5, 31.05), (31.5, 31.05))
            ThreePointArc((31.5, 31.05), (34.328427125, 32.221572875), (35.5, 35.05))
            Line((35.5, 35.05), (35.5, 67.5))
            ThreePointArc((35.5, 67.5), (34.328427125, 70.328427125), (31.5, 71.5))
            Line((31.5, 71.5), (-31.5, 71.5))
            ThreePointArc((-31.5, 71.5), (-34.328427125, 70.328427125), (-35.5, 67.5))
            Line((-35.5, 67.5), (-35.5, 35.05))
            ThreePointArc((-35.5, 35.05), (-34.328427125, 32.221572875), (-31.5, 31.05))
            Line((-31.5, 31.05), (-30.5, 31.05))
            Line((-30.5, 31.05), (-30.5, 25.05))
            ThreePointArc((-30.5, 25.05), (-29.328427125, 22.221572875), (-26.5, 21.05))
        make_face()
        with BuildLine():
            Line((30.5, -31.05), (30.5, -25.05))
            ThreePointArc((30.5, -25.05), (29.328427125, -22.221572875), (26.5, -21.05))
            Line((26.5, -21.05), (-26.5, -21.05))
            ThreePointArc((-26.5, -21.05), (-29.328427125, -22.221572875), (-30.5, -25.05))
            Line((-30.5, -25.05), (-30.5, -31.05))
            Line((-30.5, -31.05), (-31.5, -31.05))
            ThreePointArc((-31.5, -31.05), (-34.328427125, -32.221572875), (-35.5, -35.05))
            Line((-35.5, -35.05), (-35.5, -67.5))
            ThreePointArc((-35.5, -67.5), (-34.328427125, -70.328427125), (-31.5, -71.5))
            Line((-31.5, -71.5), (31.5, -71.5))
            ThreePointArc((31.5, -71.5), (34.328427125, -70.328427125), (35.5, -67.5))
            Line((35.5, -67.5), (35.5, -35.05))
            ThreePointArc((35.5, -35.05), (34.328427125, -32.221572875), (31.5, -31.05))
            Line((31.5, -31.05), (30.5, -31.05))
        make_face()
    extrude(amount=-CUT_EXTRUDE_7_DEPTH, mode=Mode.SUBTRACT)

    # 倒角3
    chamfer_3_edges = [part.edges().sort_by_distance(p)[0] for p in [
        (34.328427125, 32.221572875, 0),
        (35.5, 51.275, 0),
        (34.328427125, 70.328427125, 0),
        (0, 71.5, 0),
        (-34.328427125, 70.328427125, 0),
        (-35.5, 51.275, 0),
        (-34.328427125, 32.221572875, 0),
        (-31, 31.05, 0),
        (-30.5, 28.05, 0),
        (-29.328427125, 22.221572875, 0),
        (0, 21.05, 0),
        (29.328427125, 22.221572875, 0),
        (30.5, 28.05, 0),
        (31, 31.05, 0),
        (0, -71.5, 0),
        (34.328427125, -70.328427125, 0),
        (35.5, -51.275, 0),
        (34.328427125, -32.221572875, 0),
        (31, -31.05, 0),
        (30.5, -28.05, 0),
        (29.328427125, -22.221572875, 0),
        (0, -21.05, 0),
        (-29.328427125, -22.221572875, 0),
        (-30.5, -28.05, 0),
        (-31, -31.05, 0),
        (-34.328427125, -32.221572875, 0),
        (-35.5, -51.275, 0),
        (-34.328427125, -70.328427125, 0),
    ]]
    chamfer(chamfer_3_edges, length=CHAMFER_3_SIZE - 0.0001)  # a hair under: the kernel refuses the full size

    # 草图122 → 凸台-拉伸3 (add)
    with BuildSketch(Plane(origin=(0, 0, -3), x_dir=(-1, 0, 0), z_dir=(0, 0, -1))):
        Rectangle(SKETCH_122_W, SKETCH_122_H)
    extrude(amount=EXTRUDE_3_DEPTH)

    # 圆角11
    fillet_11_edges = [part.edges().sort_by_distance(p)[0] for p in [
        (40.5, 0, -9),
        (0, -21.05, -9),
        (-40.5, 0, -9),
        (0, 21.05, -9),
    ]]
    fillet(fillet_11_edges, radius=FILLET_11_R)

    # 草图123 → 切除-拉伸8 (cut)
    with BuildSketch(Plane(origin=(0, 0, -9), x_dir=(-1, 0, 0), z_dir=(0, 0, -1))):
        Rectangle(SKETCH_123_W, SKETCH_123_H)
    extrude(amount=-CUT_EXTRUDE_8_DEPTH, mode=Mode.SUBTRACT)

    # 圆角12
    fillet_12_edges = [part.edges().sort_by_distance(p)[0] for p in [
        (-31.5, -12.05, -6),
        (31.5, -12.05, -6),
        (31.5, 12.05, -6),
        (-31.5, 12.05, -6),
    ]]
    fillet(fillet_12_edges, radius=FILLET_12_R)


solid = part.part
